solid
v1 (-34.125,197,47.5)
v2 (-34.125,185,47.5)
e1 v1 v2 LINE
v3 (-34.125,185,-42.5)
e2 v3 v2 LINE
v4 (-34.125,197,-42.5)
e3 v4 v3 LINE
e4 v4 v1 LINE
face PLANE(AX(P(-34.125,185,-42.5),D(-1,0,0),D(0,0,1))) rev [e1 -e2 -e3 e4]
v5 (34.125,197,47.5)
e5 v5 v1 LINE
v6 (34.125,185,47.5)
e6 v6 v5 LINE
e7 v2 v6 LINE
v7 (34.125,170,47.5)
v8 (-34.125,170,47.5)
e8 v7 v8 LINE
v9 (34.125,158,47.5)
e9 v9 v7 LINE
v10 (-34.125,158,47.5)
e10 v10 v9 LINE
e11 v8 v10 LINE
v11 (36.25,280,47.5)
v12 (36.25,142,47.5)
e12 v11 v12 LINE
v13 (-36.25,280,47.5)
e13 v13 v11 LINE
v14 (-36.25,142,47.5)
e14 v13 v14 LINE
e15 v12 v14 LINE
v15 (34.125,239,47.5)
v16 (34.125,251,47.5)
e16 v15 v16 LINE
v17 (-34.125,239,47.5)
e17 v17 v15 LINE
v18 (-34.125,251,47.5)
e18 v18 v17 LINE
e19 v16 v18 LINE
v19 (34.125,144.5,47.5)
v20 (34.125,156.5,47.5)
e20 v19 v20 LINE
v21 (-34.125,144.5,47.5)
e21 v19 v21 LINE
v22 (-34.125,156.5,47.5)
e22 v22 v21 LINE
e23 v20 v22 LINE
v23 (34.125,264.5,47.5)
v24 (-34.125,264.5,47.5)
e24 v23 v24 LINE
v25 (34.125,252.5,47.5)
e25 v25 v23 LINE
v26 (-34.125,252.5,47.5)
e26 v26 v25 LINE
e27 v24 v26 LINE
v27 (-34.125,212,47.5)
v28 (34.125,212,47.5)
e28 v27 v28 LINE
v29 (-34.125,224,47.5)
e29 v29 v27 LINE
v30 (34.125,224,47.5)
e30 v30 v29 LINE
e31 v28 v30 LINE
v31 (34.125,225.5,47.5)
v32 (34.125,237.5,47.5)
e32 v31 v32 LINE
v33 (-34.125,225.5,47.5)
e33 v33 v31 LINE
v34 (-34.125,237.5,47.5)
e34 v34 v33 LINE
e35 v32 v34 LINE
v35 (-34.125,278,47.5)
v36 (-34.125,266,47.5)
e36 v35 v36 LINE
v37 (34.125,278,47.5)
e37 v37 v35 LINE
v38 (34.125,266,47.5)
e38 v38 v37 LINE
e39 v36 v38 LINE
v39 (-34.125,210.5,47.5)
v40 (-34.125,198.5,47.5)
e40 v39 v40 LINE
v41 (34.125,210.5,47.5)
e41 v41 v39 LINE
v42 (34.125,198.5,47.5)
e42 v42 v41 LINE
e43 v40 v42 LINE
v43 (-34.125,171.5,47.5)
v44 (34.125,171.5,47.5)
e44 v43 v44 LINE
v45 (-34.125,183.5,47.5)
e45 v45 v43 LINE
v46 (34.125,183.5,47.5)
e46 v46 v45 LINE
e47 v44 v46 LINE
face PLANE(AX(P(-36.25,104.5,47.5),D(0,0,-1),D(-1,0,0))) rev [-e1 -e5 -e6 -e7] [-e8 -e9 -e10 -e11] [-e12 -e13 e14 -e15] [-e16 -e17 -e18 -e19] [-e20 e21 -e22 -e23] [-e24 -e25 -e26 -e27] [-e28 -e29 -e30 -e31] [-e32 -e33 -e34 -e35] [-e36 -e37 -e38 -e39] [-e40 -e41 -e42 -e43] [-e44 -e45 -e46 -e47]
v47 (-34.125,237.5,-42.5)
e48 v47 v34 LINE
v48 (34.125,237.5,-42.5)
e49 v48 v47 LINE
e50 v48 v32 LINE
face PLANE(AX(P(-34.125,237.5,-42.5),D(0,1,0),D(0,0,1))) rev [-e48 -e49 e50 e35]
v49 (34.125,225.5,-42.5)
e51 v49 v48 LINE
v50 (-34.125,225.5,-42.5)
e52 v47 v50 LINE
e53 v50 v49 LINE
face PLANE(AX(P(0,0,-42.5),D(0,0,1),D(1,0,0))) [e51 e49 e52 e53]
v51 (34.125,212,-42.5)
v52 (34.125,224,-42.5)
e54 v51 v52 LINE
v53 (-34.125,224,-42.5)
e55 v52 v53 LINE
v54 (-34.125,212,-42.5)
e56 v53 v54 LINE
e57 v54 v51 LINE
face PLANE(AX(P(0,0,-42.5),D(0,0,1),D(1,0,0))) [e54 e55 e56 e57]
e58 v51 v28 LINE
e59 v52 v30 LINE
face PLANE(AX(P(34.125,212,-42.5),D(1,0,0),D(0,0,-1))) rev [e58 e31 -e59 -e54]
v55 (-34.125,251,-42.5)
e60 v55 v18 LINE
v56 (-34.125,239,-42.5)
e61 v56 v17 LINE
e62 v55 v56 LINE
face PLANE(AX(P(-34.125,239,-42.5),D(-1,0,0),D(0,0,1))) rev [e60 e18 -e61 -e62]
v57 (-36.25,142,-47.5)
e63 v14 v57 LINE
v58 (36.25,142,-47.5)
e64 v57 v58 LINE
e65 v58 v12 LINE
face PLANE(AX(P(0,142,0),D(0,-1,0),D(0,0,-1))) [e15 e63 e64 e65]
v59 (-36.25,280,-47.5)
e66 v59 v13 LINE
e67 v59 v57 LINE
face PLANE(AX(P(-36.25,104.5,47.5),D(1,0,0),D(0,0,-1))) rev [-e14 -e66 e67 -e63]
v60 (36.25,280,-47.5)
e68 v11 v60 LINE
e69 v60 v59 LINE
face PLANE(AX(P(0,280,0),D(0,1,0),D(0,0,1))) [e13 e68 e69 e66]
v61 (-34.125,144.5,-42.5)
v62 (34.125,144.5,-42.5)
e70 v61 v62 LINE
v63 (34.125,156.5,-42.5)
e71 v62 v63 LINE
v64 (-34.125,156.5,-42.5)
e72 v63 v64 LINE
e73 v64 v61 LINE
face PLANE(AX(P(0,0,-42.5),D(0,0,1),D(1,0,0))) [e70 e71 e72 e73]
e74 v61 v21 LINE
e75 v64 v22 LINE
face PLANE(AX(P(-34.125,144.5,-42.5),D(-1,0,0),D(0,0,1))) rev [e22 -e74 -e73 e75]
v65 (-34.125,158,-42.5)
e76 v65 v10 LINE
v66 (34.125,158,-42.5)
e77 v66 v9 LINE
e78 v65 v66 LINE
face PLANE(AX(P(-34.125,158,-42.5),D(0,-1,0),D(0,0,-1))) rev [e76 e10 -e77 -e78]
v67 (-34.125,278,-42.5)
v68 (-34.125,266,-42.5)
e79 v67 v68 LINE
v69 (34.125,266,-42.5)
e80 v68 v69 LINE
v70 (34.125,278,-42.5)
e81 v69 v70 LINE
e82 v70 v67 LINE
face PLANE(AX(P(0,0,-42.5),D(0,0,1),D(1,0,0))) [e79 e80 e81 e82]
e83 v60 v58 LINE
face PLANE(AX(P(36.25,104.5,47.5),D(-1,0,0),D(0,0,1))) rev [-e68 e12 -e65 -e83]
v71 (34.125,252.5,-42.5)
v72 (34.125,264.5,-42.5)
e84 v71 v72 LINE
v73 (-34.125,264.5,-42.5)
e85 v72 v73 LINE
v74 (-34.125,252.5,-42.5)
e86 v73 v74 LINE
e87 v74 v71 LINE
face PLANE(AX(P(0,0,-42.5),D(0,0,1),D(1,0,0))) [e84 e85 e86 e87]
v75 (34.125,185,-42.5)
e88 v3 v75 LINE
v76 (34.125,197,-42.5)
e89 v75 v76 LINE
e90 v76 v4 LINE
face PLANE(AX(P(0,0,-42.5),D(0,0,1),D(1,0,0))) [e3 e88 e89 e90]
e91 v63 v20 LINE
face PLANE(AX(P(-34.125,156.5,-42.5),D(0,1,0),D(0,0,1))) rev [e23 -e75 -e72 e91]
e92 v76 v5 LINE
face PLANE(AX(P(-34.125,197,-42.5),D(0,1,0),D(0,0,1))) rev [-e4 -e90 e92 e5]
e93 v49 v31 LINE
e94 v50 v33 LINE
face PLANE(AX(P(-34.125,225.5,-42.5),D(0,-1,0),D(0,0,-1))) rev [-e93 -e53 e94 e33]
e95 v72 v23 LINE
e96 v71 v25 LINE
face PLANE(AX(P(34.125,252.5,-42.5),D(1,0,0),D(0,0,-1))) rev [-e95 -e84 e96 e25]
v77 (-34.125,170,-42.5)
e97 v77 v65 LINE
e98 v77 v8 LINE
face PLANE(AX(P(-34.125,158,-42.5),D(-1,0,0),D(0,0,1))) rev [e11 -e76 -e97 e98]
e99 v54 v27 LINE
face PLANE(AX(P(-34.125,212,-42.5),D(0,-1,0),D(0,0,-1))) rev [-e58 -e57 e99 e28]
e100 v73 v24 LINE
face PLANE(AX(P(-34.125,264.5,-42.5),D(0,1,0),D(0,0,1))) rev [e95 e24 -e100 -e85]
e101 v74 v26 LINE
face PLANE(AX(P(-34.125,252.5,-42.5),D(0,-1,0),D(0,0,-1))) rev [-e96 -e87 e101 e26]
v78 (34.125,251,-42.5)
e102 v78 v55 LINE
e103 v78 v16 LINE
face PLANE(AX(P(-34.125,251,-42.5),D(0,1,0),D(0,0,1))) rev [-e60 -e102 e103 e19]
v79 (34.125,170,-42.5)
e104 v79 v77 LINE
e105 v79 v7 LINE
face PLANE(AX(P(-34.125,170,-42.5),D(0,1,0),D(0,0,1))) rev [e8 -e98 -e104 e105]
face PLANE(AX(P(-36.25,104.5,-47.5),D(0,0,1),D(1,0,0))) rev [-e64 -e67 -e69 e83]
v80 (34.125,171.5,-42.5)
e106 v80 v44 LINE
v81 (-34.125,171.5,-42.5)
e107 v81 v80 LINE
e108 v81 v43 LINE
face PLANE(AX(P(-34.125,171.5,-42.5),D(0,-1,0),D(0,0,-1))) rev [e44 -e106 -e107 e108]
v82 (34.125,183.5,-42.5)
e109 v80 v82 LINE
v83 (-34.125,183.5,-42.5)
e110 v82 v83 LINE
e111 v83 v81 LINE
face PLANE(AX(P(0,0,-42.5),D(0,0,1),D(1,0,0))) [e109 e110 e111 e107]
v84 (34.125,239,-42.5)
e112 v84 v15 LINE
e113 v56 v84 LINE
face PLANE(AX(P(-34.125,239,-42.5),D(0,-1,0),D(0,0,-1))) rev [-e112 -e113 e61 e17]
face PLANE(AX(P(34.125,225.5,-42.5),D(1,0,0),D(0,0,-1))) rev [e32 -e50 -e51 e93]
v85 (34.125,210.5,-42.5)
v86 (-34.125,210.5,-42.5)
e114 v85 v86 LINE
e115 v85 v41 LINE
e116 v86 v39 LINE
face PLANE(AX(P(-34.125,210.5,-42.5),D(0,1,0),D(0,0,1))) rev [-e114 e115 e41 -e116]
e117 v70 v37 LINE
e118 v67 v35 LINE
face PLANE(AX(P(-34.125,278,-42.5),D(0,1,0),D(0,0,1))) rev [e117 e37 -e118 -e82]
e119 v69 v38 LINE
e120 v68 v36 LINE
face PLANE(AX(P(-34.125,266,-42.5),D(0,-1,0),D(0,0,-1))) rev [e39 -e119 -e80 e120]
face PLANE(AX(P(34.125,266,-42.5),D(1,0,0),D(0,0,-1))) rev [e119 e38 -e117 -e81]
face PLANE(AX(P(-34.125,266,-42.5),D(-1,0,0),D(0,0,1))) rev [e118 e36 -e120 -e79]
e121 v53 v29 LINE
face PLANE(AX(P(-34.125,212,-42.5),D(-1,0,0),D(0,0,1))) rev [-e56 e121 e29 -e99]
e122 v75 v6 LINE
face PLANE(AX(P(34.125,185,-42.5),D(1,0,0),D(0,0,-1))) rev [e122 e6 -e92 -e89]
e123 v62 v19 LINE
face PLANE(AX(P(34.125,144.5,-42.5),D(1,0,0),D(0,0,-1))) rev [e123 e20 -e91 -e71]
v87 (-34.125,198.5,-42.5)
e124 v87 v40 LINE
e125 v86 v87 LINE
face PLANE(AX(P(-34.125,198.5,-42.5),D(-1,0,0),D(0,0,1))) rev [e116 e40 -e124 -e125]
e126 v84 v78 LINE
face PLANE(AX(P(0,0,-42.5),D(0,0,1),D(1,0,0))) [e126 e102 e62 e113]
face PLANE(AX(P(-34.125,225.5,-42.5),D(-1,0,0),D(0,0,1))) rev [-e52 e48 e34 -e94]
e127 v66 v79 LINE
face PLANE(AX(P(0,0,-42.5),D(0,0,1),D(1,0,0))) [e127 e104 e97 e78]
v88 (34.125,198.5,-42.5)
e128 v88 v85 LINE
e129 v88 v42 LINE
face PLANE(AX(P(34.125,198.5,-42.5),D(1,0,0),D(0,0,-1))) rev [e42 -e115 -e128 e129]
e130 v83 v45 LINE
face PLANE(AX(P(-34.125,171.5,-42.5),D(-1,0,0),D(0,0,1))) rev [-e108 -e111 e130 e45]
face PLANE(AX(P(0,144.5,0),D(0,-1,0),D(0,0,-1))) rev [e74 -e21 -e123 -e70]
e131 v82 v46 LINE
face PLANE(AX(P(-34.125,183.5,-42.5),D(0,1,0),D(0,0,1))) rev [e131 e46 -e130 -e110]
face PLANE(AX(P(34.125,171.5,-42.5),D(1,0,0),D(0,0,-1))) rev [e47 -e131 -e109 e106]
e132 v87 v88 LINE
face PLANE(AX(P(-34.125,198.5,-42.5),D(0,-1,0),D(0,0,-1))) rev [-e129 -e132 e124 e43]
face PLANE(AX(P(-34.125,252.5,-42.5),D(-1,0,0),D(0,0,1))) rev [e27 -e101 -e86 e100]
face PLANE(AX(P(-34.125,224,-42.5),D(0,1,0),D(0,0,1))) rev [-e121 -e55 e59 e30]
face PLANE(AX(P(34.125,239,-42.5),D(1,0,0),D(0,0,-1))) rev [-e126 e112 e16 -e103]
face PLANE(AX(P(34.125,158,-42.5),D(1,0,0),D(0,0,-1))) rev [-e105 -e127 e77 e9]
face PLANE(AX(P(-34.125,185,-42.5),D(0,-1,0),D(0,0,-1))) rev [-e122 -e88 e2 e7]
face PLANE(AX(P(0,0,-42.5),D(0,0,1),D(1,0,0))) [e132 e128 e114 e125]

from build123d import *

# Parameters (mm, degrees)
SKETCH1_W           = 72.5
SKETCH1_H           = 95
BOSS_EXTRUDE1_DEPTH = 104.5
SKETCH2_W           = 68.25
SKETCH2_H           = 22.5
CUT_EXTRUDE1_DEPTH  = 90
SKETCH3_W           = 72.5
SKETCH3_H           = 95
BOSS_EXTRUDE2_DEPTH = 175.5
SKETCH4_W           = 68.25
SKETCH4_H           = 12
CUT_EXTRUDE3_DEPTH  = 90
SPLIT1_OUTLINE_W    = 72.5
SPLIT1_OUTLINE_H    = 95
SPLIT1_DEPTH        = 144.5
SKETCH5_W           = 72.5
SKETCH5_H           = 95
BOSS_EXTRUDE3_DEPTH = 2.5


# Read off the part's stored shape, not the designer's step: Split1
with BuildPart() as part:
    # Sketch1 → Boss-Extrude1 (new body)
    with BuildSketch(Plane(origin=(0, 0, 0), x_dir=(1, 0, 0), z_dir=(0, 1, 0))):
        Rectangle(SKETCH1_W, SKETCH1_H)
    extrude(amount=BOSS_EXTRUDE1_DEPTH)

    # Sketch2 → Cut-Extrude1 (cut)
    with BuildSketch(Plane.XY.offset(47.5)):
        with Locations((0, 13.75)):
            Rectangle(SKETCH2_W, SKETCH2_H)
        with Locations((0, 39.25)):
            Rectangle(SKETCH2_W, SKETCH2_H)
        with Locations((0, 64.75)):
            Rectangle(SKETCH2_W, SKETCH2_H)
        with Locations((0, 90.25)):
            Rectangle(SKETCH2_W, SKETCH2_H)
    extrude(amount=-CUT_EXTRUDE1_DEPTH, mode=Mode.SUBTRACT)

    # Sketch3 → Boss-Extrude2 (add)
    with BuildSketch(Plane(origin=(0, 104.5, 0), x_dir=(1, 0, 0), z_dir=(0, 1, 0))):
        Rectangle(SKETCH3_W, SKETCH3_H)
    extrude(amount=BOSS_EXTRUDE2_DEPTH)

    # Sketch4 → Cut-Extrude3 (cut)
    with BuildSketch(Plane.XY.offset(47.5)):
        with Locations((0, 110)):
            Rectangle(SKETCH4_W, SKETCH4_H)
        with Locations((0, 123.5)):
            Rectangle(SKETCH4_W, SKETCH4_H)
        with Locations((0, 137)):
            Rectangle(SKETCH4_W, SKETCH4_H)
        with Locations((0, 150.5)):
            Rectangle(SKETCH4_W, SKETCH4_H)
        with Locations((0, 164)):
            Rectangle(SKETCH4_W, SKETCH4_H)
        with Locations((0, 177.5)):
            Rectangle(SKETCH4_W, SKETCH4_H)
        with Locations((0, 191)):
            Rectangle(SKETCH4_W, SKETCH4_H)
        with Locations((0, 204.5)):
            Rectangle(SKETCH4_W, SKETCH4_H)
        with Locations((0, 218)):
            Rectangle(SKETCH4_W, SKETCH4_H)
        with Locations((0, 231.5)):
            Rectangle(SKETCH4_W, SKETCH4_H)
        with Locations((0, 245)):
            Rectangle(SKETCH4_W, SKETCH4_H)
        with Locations((0, 258.5)):
            Rectangle(SKETCH4_W, SKETCH4_H)
        with Locations((0, 272)):
            Rectangle(SKETCH4_W, SKETCH4_H)
    extrude(amount=-CUT_EXTRUDE3_DEPTH, mode=Mode.SUBTRACT)

    # Split1 outline → Split1 (cut)
    with BuildSketch(Plane(origin=(0, 0, 0), x_dir=(1, 0, 0), z_dir=(0, 1, 0))):
        Rectangle(SPLIT1_OUTLINE_W, SPLIT1_OUTLINE_H)
    extrude(amount=SPLIT1_DEPTH, mode=Mode.SUBTRACT)

    # Sketch5 → Boss-Extrude3 (add)
    with BuildSketch(Plane.XZ.offset(-144.5)):
        Rectangle(SKETCH5_W, SKETCH5_H)
    extrude(amount=BOSS_EXTRUDE3_DEPTH)


solid = part.part
